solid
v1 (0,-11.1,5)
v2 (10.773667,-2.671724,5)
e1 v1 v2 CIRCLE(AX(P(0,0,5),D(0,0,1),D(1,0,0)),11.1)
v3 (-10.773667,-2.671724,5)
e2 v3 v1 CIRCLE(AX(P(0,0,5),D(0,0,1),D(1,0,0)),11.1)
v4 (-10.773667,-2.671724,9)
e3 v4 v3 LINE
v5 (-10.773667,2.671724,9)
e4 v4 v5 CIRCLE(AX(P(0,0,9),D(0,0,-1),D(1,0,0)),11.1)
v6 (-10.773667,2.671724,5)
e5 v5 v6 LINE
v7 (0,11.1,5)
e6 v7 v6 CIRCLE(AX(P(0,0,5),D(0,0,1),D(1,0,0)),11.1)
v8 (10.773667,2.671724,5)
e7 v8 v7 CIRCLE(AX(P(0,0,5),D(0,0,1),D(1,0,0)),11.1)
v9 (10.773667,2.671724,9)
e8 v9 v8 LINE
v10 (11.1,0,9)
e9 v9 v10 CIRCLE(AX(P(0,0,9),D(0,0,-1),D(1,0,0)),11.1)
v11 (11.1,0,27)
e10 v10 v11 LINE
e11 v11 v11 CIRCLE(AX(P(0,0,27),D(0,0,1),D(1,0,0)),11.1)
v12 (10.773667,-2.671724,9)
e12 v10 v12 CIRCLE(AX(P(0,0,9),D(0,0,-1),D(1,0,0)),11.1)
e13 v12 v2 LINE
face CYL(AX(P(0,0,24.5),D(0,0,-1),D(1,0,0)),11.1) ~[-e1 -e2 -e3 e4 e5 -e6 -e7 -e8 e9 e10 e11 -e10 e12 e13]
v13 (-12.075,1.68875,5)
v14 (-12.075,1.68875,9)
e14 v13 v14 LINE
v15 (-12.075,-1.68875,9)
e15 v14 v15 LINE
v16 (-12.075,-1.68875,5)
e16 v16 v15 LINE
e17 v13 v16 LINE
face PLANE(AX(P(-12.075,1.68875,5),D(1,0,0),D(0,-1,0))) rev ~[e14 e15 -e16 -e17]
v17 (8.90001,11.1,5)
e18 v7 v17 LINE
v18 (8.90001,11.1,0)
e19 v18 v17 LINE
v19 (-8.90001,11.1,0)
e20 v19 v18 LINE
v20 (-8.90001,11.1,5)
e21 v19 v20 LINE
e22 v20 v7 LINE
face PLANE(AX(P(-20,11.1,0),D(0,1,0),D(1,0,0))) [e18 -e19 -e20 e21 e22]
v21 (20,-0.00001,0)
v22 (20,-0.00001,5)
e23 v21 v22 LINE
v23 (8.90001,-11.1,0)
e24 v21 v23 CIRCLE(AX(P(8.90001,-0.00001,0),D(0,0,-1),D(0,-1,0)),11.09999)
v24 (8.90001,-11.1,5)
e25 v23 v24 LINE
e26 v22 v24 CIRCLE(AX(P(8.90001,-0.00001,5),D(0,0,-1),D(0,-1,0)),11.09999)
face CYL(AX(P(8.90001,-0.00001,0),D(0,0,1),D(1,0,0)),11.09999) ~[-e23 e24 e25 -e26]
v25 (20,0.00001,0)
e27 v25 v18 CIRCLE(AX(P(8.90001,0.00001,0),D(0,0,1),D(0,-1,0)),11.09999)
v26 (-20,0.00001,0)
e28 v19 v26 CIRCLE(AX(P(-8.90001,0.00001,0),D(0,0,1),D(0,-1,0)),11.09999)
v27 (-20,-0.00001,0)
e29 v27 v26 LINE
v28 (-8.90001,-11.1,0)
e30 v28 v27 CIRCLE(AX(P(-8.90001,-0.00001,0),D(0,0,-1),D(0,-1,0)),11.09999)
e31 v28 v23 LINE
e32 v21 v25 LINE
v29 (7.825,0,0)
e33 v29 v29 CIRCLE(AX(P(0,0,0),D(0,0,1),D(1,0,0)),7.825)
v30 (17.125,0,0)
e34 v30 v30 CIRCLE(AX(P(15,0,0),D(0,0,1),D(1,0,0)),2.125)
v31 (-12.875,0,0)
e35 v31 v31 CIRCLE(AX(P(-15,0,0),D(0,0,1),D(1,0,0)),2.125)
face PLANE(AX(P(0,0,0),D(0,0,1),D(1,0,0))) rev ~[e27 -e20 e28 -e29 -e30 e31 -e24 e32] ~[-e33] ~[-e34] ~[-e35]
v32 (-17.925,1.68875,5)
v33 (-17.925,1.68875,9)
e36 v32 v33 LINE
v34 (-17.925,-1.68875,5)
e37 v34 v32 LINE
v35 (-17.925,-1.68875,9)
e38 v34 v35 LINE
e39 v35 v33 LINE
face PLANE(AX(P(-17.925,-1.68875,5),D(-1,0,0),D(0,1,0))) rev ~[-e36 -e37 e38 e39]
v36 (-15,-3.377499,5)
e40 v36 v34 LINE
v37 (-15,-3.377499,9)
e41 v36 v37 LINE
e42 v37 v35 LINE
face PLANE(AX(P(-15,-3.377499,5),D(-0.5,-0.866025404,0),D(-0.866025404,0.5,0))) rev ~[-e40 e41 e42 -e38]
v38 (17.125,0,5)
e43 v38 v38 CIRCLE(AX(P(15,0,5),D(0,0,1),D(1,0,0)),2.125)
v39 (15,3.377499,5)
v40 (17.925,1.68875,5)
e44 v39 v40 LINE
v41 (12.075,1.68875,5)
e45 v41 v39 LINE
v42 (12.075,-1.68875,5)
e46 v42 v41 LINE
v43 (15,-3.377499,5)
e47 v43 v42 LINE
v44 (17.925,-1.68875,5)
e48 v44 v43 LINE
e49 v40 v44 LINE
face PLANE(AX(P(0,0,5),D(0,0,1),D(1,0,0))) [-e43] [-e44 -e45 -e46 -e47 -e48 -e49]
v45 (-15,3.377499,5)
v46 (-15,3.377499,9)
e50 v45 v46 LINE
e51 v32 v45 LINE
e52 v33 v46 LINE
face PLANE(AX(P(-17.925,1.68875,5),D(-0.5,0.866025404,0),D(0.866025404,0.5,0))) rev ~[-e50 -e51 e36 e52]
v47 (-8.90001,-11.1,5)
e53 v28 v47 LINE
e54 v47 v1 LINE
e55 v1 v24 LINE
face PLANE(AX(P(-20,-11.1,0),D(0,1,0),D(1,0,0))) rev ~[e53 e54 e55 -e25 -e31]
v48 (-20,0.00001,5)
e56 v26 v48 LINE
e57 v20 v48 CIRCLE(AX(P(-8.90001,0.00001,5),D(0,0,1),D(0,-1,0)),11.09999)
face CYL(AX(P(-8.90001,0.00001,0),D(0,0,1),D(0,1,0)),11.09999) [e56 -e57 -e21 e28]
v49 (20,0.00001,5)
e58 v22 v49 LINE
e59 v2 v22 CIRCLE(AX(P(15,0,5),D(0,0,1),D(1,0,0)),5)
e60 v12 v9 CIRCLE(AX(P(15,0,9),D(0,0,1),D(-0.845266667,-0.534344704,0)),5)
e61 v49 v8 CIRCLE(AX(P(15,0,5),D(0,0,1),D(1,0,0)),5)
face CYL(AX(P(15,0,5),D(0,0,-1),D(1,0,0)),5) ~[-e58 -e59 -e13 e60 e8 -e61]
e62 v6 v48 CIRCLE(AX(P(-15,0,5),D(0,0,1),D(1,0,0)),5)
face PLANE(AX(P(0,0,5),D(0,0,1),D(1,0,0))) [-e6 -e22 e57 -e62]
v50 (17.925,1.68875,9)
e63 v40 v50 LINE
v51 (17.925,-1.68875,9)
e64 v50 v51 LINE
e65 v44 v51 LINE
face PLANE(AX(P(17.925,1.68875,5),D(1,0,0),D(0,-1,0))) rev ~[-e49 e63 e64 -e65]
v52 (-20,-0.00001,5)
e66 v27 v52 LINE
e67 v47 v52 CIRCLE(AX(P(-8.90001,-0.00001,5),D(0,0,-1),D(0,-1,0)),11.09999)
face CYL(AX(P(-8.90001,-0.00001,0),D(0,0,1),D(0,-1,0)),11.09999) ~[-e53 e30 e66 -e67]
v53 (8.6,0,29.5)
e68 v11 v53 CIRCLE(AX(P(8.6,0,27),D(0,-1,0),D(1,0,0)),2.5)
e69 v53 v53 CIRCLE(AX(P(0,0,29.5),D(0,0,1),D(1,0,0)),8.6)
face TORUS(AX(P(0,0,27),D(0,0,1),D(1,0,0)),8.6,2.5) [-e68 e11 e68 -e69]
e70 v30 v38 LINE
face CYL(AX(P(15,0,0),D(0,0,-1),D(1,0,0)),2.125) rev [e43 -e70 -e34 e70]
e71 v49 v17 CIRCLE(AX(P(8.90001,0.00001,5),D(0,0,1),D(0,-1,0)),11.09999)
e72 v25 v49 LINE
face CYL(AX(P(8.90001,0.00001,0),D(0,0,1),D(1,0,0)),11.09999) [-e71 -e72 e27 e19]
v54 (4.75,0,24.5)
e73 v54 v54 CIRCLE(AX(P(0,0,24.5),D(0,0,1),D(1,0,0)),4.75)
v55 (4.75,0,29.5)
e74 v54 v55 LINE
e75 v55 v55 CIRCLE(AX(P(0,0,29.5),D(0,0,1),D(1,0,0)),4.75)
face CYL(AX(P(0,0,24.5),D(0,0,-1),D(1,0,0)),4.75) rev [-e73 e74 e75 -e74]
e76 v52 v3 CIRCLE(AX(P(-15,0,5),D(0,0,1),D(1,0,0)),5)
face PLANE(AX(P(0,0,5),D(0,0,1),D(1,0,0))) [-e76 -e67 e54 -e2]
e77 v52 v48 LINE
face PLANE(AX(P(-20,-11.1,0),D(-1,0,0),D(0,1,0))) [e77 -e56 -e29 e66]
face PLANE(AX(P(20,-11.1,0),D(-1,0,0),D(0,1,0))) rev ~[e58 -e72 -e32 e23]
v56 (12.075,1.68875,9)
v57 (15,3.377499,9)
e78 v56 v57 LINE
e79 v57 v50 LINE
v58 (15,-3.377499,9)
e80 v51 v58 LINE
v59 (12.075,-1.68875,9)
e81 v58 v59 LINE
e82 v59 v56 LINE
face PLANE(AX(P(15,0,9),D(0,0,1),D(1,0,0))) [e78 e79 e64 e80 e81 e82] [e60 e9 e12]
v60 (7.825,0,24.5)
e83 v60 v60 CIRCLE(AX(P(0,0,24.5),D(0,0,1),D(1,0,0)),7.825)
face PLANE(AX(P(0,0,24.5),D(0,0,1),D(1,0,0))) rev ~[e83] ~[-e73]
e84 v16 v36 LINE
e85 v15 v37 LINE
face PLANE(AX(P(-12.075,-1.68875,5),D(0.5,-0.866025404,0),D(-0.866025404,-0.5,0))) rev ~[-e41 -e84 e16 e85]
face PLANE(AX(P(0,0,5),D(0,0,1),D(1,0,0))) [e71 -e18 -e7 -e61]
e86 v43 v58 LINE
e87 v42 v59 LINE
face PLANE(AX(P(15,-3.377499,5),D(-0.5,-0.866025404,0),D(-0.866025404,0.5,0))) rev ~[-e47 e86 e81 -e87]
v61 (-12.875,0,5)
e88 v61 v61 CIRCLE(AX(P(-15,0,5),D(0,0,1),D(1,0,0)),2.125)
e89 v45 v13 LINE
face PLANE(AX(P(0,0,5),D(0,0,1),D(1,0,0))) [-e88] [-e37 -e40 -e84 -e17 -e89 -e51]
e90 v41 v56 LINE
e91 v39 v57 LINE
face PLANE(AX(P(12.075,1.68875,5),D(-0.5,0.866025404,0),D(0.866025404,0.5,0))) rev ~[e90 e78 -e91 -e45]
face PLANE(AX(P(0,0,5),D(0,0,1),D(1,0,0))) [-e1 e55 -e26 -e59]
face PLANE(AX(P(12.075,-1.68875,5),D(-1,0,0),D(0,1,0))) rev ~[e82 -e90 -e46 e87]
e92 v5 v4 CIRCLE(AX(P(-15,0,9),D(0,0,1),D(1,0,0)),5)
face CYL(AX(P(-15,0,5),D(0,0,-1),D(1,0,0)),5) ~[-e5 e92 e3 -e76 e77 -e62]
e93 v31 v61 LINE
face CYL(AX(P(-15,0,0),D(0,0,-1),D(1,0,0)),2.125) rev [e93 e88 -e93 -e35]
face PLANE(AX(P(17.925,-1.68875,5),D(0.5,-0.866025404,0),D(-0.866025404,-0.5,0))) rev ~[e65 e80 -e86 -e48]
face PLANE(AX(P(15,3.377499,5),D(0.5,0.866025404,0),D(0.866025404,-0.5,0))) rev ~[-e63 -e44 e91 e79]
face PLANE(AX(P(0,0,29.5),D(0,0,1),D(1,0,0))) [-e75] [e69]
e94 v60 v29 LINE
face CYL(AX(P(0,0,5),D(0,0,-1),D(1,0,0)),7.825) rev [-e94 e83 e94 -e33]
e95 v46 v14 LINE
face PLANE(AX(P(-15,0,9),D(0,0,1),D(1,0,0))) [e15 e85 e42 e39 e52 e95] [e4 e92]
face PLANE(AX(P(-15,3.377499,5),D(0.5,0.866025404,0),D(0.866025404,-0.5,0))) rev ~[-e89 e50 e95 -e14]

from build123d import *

# Parameters (mm, degrees)
F0_W     = 40
F0_H     = 22.2
F0_R     = 2.125
F0_R_2   = 7.825
F1_DEPTH = 5
F2_R     = 11.1
F2_R_2   = 7.825
F3_DEPTH = 19.5
F4_R     = 11.1
F4_R_2   = 4.75
F5_DEPTH = 5
F6_R     = 11.09999
F7_R     = 2.5
F8_R     = 5
F9_DEPTH = 4


# Not quite as in the source:
# - a fillet or chamfer is up to 0.001 mm smaller than in the source, because OpenCascade refuses the exact size


with BuildPart() as f1:
    # F0 (on Top) → F1 (new body)
    with BuildSketch(Plane.XY):
        Rectangle(F0_W, F0_H)
        with Locations((-15, 0)):
            Circle(F0_R, mode=Mode.SUBTRACT)
        Circle(F0_R_2, mode=Mode.SUBTRACT)
        with Locations((15, 0)):
            Circle(F0_R, mode=Mode.SUBTRACT)
    extrude(amount=F1_DEPTH)

    # F2 (on face) → F3 (join)
    with BuildSketch(Plane.XY.offset(5)):
        Circle(F2_R)
        Circle(F2_R_2, mode=Mode.SUBTRACT)
    extrude(amount=F3_DEPTH)

    # F4 (on face) → F5 (join)
    with BuildSketch(Plane.XY.offset(24.5)):
        Circle(F4_R)
        Circle(F4_R_2, mode=Mode.SUBTRACT)
    extrude(amount=F5_DEPTH)

    # F6 (radius 11.1 in the source; OpenCascade refuses exactly that, so slightly less here)
    f6_edges = [f1.edges().sort_by_distance(p)[0] for p in [
        (-20, 11.1, 2.5),
        (-20, -11.1, 2.5),
        (20, -11.1, 2.5),
        (20, 11.1, 2.5),
    ]]
    fillet(f6_edges, radius=F6_R)

    # F7
    f7_edges = [f1.edges().sort_by_distance(p)[0] for p in [
        (-11.1, 0, 29.5),
    ]]
    fillet(f7_edges, radius=F7_R)

    # F8 (on face) → F9 (join)
    with BuildSketch(Plane.XY.offset(5)):
        with Locations((-15, 0)):
            Circle(F8_R)
        Polygon((-15, 3.3774990748), (-12.075, 1.6887495374), (-12.075, -1.6887495374), (-15, -3.3774990748), (-17.925, -1.6887495374), (-17.925, 1.6887495374), align=None, mode=Mode.SUBTRACT)
        with Locations((15, 0)):
            Circle(F8_R)
        Polygon((12.075, -1.6887495374), (12.075, 1.6887495374), (15, 3.3774990748), (17.925, 1.6887495374), (17.925, -1.6887495374), (15, -3.3774990748), align=None, mode=Mode.SUBTRACT)
    extrude(amount=F9_DEPTH)


solid = f1.part
